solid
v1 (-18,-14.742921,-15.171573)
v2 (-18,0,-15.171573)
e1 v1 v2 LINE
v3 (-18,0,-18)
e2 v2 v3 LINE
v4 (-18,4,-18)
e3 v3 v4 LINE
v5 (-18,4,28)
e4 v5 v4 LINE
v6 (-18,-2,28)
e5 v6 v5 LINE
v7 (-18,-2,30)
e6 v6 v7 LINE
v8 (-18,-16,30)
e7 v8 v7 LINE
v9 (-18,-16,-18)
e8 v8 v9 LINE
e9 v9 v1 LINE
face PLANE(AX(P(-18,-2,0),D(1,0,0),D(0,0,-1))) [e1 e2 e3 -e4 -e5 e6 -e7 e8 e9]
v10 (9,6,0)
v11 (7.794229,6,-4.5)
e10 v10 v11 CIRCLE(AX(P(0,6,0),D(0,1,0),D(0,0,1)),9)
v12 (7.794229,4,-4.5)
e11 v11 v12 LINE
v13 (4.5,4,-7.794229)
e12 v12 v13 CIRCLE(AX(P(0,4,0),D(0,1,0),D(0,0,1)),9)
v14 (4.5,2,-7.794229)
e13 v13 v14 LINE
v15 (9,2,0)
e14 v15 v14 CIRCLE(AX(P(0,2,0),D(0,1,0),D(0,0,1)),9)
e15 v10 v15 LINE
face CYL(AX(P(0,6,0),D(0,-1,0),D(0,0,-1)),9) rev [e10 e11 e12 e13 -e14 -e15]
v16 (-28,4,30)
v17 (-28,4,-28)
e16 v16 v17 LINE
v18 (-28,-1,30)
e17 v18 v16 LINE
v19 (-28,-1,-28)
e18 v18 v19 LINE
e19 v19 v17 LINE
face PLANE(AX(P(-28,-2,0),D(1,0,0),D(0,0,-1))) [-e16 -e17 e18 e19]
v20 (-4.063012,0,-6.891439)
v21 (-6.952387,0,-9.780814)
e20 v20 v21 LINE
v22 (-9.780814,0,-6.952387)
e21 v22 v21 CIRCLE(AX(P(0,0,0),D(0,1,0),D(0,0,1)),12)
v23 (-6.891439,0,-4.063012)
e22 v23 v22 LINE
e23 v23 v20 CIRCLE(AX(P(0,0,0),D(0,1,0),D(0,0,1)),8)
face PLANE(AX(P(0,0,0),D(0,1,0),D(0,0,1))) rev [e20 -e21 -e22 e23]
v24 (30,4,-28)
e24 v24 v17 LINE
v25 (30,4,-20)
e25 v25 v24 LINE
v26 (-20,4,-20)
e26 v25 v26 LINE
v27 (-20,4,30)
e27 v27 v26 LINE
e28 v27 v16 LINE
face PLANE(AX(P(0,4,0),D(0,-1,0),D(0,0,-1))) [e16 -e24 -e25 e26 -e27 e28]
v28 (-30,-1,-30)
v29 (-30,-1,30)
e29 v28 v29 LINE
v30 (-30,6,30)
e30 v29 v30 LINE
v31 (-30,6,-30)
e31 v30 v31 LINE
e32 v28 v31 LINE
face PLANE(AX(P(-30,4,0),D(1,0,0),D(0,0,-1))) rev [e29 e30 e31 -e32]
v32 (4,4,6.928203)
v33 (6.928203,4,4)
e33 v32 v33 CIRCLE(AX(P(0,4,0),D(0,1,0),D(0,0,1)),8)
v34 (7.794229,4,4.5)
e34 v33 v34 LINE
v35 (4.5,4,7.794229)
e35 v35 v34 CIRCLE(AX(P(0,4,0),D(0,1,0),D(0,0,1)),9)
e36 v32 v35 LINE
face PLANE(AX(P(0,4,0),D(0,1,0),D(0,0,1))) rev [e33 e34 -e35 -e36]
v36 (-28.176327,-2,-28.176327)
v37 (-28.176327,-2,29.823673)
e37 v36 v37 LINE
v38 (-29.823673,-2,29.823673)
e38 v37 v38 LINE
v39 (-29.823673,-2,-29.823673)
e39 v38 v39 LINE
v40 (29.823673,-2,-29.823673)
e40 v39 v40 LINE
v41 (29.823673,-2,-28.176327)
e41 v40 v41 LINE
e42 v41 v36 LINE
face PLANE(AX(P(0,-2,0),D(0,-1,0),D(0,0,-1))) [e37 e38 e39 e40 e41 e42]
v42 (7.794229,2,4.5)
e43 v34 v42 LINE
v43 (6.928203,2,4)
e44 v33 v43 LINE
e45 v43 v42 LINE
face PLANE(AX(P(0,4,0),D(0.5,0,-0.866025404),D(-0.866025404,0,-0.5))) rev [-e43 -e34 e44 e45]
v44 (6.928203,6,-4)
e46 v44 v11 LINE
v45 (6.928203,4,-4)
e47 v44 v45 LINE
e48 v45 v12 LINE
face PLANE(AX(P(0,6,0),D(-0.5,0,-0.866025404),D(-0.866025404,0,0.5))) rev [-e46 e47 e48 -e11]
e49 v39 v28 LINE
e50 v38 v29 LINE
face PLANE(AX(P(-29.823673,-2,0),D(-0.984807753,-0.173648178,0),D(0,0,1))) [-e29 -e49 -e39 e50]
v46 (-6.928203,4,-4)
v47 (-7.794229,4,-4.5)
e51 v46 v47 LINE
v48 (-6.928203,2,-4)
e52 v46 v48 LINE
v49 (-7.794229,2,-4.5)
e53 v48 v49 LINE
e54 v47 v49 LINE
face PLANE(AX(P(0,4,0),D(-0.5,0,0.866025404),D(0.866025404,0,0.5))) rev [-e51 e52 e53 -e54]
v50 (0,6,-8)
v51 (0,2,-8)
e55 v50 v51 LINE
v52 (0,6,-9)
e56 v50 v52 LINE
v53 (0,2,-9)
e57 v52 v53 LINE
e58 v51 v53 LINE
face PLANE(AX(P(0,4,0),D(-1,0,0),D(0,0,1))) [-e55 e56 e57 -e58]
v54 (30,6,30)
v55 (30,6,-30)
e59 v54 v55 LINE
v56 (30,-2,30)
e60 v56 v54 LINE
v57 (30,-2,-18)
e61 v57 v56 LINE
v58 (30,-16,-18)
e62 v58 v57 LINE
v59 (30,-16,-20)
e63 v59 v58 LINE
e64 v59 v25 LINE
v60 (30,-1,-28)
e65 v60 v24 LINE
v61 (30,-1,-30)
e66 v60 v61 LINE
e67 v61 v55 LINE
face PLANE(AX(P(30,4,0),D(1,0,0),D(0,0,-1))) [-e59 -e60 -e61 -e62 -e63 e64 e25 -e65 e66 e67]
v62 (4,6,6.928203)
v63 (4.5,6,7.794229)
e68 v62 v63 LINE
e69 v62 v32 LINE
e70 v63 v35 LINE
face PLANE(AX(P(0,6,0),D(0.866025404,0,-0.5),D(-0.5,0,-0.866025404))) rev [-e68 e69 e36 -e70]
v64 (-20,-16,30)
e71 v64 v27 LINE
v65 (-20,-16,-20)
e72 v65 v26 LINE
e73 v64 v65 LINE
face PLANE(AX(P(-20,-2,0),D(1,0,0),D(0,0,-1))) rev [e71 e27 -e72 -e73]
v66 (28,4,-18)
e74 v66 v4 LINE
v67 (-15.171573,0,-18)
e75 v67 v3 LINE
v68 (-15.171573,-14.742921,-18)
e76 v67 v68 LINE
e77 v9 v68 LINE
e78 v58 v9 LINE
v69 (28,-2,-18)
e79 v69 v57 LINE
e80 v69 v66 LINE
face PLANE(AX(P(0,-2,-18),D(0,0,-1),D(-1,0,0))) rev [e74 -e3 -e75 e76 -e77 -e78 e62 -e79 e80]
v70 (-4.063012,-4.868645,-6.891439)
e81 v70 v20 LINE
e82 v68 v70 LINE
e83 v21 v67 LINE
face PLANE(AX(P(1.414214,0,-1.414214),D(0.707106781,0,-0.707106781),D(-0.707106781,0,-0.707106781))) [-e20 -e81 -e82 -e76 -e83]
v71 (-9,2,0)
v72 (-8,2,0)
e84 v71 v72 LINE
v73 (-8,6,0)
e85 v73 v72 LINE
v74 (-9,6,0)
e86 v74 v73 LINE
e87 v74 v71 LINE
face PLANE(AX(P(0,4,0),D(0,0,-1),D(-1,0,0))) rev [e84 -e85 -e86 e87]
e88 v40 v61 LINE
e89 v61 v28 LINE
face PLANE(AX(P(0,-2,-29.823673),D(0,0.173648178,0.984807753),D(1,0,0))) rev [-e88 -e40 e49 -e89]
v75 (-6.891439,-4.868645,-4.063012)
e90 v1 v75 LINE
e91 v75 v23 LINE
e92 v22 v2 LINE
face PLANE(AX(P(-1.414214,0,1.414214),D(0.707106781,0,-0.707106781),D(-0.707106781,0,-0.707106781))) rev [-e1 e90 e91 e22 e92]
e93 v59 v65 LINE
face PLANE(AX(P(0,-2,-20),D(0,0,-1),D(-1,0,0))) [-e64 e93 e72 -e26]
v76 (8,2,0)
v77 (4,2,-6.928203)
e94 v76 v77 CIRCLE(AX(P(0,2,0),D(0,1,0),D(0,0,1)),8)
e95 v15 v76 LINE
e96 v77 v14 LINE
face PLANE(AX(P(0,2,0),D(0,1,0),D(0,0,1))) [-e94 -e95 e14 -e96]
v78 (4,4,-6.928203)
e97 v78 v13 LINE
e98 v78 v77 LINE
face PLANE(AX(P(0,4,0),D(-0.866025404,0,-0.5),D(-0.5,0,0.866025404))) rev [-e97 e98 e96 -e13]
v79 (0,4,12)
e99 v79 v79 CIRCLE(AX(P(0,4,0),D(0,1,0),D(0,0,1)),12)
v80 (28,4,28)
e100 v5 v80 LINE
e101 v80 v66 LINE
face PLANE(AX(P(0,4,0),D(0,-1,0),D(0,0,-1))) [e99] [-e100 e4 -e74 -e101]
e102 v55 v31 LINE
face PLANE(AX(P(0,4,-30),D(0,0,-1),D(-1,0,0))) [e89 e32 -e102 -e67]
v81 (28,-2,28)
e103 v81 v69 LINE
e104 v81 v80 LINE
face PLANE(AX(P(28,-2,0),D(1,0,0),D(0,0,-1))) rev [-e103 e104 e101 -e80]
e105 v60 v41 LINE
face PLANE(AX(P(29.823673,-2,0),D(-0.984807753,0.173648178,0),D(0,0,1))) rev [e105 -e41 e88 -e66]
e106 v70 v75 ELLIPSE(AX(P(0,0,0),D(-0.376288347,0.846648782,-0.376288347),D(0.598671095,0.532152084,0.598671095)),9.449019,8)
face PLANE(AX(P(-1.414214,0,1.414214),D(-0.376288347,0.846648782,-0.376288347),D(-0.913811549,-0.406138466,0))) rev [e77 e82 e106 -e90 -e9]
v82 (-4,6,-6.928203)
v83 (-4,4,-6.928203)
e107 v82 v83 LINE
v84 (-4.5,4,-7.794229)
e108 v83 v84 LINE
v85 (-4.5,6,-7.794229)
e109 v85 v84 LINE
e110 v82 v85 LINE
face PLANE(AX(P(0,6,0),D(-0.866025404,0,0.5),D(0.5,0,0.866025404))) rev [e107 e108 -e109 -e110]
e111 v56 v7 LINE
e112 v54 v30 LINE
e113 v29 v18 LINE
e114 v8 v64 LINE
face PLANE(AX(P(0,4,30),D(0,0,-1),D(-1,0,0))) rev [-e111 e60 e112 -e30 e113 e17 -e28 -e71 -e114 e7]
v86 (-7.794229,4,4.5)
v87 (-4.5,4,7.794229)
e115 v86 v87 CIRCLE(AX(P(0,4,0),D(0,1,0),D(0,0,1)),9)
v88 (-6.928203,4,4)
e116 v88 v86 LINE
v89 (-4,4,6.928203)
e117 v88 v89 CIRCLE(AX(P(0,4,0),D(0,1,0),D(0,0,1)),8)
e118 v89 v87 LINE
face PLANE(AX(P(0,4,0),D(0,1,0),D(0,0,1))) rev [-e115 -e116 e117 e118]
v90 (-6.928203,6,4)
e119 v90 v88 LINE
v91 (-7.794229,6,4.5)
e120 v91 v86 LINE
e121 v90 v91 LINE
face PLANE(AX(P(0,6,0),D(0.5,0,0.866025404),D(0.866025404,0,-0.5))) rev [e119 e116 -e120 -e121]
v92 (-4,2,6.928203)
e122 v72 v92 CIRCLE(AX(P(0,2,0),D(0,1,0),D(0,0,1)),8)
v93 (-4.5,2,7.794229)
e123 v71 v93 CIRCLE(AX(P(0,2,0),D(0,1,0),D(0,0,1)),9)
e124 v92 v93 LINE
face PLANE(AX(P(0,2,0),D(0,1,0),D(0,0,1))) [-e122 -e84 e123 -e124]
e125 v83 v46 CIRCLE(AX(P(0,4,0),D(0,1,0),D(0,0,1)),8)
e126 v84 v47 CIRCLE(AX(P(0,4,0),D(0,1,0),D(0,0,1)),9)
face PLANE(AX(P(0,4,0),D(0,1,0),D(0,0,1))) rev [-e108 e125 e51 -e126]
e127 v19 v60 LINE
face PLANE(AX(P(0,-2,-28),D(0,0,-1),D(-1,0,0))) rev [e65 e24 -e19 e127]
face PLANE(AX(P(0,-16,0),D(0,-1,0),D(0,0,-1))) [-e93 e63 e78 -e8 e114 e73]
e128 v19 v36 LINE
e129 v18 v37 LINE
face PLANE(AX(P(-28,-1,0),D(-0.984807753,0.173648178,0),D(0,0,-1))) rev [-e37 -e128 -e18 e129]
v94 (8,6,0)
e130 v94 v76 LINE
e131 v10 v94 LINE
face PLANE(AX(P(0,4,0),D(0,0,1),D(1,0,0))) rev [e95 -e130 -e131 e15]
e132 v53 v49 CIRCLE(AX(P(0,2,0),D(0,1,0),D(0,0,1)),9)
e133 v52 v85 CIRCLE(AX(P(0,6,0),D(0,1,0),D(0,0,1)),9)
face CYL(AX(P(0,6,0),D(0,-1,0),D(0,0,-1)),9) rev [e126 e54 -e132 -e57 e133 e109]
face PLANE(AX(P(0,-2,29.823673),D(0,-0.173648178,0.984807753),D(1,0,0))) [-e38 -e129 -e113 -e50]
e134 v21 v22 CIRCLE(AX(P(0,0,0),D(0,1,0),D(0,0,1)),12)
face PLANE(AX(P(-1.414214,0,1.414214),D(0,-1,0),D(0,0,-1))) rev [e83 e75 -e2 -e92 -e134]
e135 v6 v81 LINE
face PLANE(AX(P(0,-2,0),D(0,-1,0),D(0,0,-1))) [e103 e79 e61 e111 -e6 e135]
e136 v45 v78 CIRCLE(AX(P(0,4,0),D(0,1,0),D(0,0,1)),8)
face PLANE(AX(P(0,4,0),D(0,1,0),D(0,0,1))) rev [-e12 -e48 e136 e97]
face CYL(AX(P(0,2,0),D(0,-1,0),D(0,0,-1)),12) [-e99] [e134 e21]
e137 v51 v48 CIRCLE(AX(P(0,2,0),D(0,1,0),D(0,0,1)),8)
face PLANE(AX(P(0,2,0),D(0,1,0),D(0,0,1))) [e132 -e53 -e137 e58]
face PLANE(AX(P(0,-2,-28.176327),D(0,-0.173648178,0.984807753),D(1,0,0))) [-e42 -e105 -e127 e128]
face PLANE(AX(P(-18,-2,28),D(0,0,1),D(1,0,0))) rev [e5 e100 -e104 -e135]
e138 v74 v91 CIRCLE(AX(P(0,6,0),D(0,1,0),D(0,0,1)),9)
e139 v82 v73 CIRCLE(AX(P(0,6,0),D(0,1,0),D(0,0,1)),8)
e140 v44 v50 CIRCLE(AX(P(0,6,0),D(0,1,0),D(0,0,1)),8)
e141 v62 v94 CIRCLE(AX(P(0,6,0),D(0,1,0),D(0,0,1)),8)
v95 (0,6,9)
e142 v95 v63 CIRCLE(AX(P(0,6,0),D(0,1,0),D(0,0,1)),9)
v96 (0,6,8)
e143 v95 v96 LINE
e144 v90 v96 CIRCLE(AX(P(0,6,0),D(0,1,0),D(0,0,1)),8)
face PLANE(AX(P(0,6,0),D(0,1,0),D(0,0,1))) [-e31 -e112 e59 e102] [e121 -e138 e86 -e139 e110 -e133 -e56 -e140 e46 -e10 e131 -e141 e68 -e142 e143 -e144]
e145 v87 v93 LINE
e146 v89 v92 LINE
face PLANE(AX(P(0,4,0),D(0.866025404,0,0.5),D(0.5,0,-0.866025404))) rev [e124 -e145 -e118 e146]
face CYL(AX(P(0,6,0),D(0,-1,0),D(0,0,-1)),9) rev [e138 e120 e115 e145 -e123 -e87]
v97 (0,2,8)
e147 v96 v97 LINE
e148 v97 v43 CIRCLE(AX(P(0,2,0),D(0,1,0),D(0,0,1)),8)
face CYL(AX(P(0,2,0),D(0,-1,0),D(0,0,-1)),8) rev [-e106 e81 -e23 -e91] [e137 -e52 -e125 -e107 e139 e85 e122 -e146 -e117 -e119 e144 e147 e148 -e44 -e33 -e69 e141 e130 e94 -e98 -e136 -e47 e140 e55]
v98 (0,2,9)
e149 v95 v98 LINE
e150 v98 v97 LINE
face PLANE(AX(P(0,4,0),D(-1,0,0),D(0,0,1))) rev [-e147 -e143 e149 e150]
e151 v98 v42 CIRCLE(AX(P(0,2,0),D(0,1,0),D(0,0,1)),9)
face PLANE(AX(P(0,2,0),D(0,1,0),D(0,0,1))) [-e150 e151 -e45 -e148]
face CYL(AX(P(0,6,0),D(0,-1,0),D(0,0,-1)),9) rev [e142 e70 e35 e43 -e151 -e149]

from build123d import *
from OCP.BRepFilletAPI import BRepFilletAPI_MakeChamfer
from build123d.topology import SkipClean

# Parameters (mm, degrees)
SKETCH1_R                 = 12
SKETCH1_R_2               = 8
BOSS_EXTRUDE4_DEPTH       = 2
BOSS_EXTRUDE5_START       = 2
SKETCH1_9_R               = 12
SKETCH1_9_R_2             = 9
BOSS_EXTRUDE5_DEPTH       = 4
BOSS_EXTRUDE6_START       = 2
BOSS_EXTRUDE6_DEPTH       = 2
BOSS_EXTRUDE7_START       = 4
BOSS_EXTRUDE7_DEPTH       = 2
BOSS_EXTRUDE8_START       = 4
SKETCH1_12_W              = 60
SKETCH1_12_H              = 60
SKETCH1_12_R              = 12
BOSS_EXTRUDE8_DEPTH       = 2
BOSS_EXTRUDE9_DEPTH       = 6
CHAMFER1_SIZE             = 1
CHAMFER1_SIZE2            = 0.176326981
BOSS_EXTRUDE10_DEPTH      = 6
BOSS_EXTRUDE11_DEPTH      = 20
BOSS_EXTRUDE12_DEPTH      = 2
BOSS_EXTRUDE12_DEPTH_BACK = 2
SKETCH1_14_R              = 8
CUT_EXTRUDE1_DEPTH        = 46.343136195


with BuildPart() as part:
    # Sketch1 → Boss-Extrude4 (new body)
    with BuildSketch(Plane(origin=(0, 0, 0), x_dir=(1, 0, 0), z_dir=(0, 1, 0))):
        with Locations(Location((0, 0, 0), (0, 0, 270))):
            Circle(SKETCH1_R)
        with Locations(Location((0, 0, 0), (0, 0, 270))):
            Circle(SKETCH1_R_2, mode=Mode.SUBTRACT)
    extrude(amount=BOSS_EXTRUDE4_DEPTH)

    # Sketch1<9> → Boss-Extrude5 (add)
    with BuildSketch(Plane(origin=(0, 0, 0), x_dir=(1, 0, 0), z_dir=(0, 1, 0)).offset(BOSS_EXTRUDE5_START)):
        with Locations(Location((0, 0, 0), (0, 0, 270))):
            Circle(SKETCH1_9_R)
        with Locations(Location((0, 0, 0), (0, 0, 270))):
            Circle(SKETCH1_9_R_2, mode=Mode.SUBTRACT)
    extrude(amount=BOSS_EXTRUDE5_DEPTH)

    # Sketch1<10> → Boss-Extrude6 (add)
    with SkipClean():  # the faces are left unmerged after this step: merging them gives an invalid solid
        with BuildSketch(Plane(origin=(0, 0, 0), x_dir=(1, 0, 0), z_dir=(0, 1, 0)).offset(BOSS_EXTRUDE6_START)):
            with BuildLine():
                ThreePointArc((0, 8), (2.070552361, 7.72740661), (4, 6.92820323))
                Line((4, 6.92820323), (4.5, 7.794228634))
                ThreePointArc((4.5, 7.794228634), (2.329371406, 8.693332437), (0, 9))
                Line((0, 9), (0, 8))
            make_face()
            with BuildLine():
                ThreePointArc((-8, 0), (-7.72740661, 2.070552361), (-6.92820323, 4))
                Line((-6.92820323, 4), (-7.794228634, 4.5))
                ThreePointArc((-7.794228634, 4.5), (-8.693332437, 2.329371406), (-9, 0))
                Line((-9, 0), (-8, 0))
            make_face()
            with BuildLine():
                Line((0, -9), (0, -8))
                ThreePointArc((0, -8), (-2.070552361, -7.72740661), (-4, -6.92820323))
                Line((-4, -6.92820323), (-4.5, -7.794228634))
                ThreePointArc((-4.5, -7.794228634), (-2.329371406, -8.693332437), (0, -9))
            make_face()
            with BuildLine():
                Line((9, 0), (8, 0))
                ThreePointArc((8, 0), (7.72740661, -2.070552361), (6.92820323, -4))
                Line((6.92820323, -4), (7.794228634, -4.5))
                ThreePointArc((7.794228634, -4.5), (8.693332437, -2.329371406), (9, 0))
            make_face()
        extrude(amount=BOSS_EXTRUDE6_DEPTH)

    # Sketch1<11> → Boss-Extrude7 (add)
    with SkipClean():  # the faces are left unmerged after this step: merging them gives an invalid solid
        with BuildSketch(Plane(origin=(0, 0, 0), x_dir=(1, 0, 0), z_dir=(0, 1, 0)).offset(BOSS_EXTRUDE7_START)):
            with BuildLine():
                ThreePointArc((0, 8), (2.070552361, 7.72740661), (4, 6.92820323))
                Line((4, 6.92820323), (4.5, 7.794228634))
                ThreePointArc((4.5, 7.794228634), (2.329371406, 8.693332437), (0, 9))
                Line((0, 9), (0, 8))
            make_face()
            with BuildLine():
                ThreePointArc((4, 6.92820323), (5.656854249, 5.656854249), (6.92820323, 4))
                Line((6.92820323, 4), (7.794228634, 4.5))
                ThreePointArc((7.794228634, 4.5), (6.363961031, 6.363961031), (4.5, 7.794228634))
                Line((4.5, 7.794228634), (4, 6.92820323))
            make_face()
            with BuildLine():
                ThreePointArc((-8, 0), (-7.72740661, 2.070552361), (-6.92820323, 4))
                Line((-6.92820323, 4), (-7.794228634, 4.5))
                ThreePointArc((-7.794228634, 4.5), (-8.693332437, 2.329371406), (-9, 0))
                Line((-9, 0), (-8, 0))
            make_face()
            with BuildLine():
                ThreePointArc((-6.92820323, 4), (-5.656854249, 5.656854249), (-4, 6.92820323))
                Line((-4, 6.92820323), (-4.5, 7.794228634))
                ThreePointArc((-4.5, 7.794228634), (-6.363961031, 6.363961031), (-7.794228634, 4.5))
                Line((-7.794228634, 4.5), (-6.92820323, 4))
            make_face()
            with BuildLine():
                Line((-4.5, -7.794228634), (-4, -6.92820323))
                ThreePointArc((-4, -6.92820323), (-5.656854249, -5.656854249), (-6.92820323, -4))
                Line((-6.92820323, -4), (-7.794228634, -4.5))
                ThreePointArc((-7.794228634, -4.5), (-6.363961031, -6.363961031), (-4.5, -7.794228634))
            make_face()
            with BuildLine():
                Line((0, -9), (0, -8))
                ThreePointArc((0, -8), (-2.070552361, -7.72740661), (-4, -6.92820323))
                Line((-4, -6.92820323), (-4.5, -7.794228634))
                ThreePointArc((-4.5, -7.794228634), (-2.329371406, -8.693332437), (0, -9))
            make_face()
            with BuildLine():
                Line((9, 0), (8, 0))
                ThreePointArc((8, 0), (7.72740661, -2.070552361), (6.92820323, -4))
                Line((6.92820323, -4), (7.794228634, -4.5))
                ThreePointArc((7.794228634, -4.5), (8.693332437, -2.329371406), (9, 0))
            make_face()
            with BuildLine():
                Line((7.794228634, -4.5), (6.92820323, -4))
                ThreePointArc((6.92820323, -4), (5.656854249, -5.656854249), (4, -6.92820323))
                Line((4, -6.92820323), (4.5, -7.794228634))
                ThreePointArc((4.5, -7.794228634), (6.363961031, -6.363961031), (7.794228634, -4.5))
            make_face()
        extrude(amount=BOSS_EXTRUDE7_DEPTH)

    # Sketch1<12> → Boss-Extrude8 (add)
    with SkipClean():  # the faces are left unmerged after this step: merging them gives an invalid solid
        with BuildSketch(Plane(origin=(0, 0, 0), x_dir=(1, 0, 0), z_dir=(0, 1, 0)).offset(BOSS_EXTRUDE8_START)):
            Rectangle(SKETCH1_12_W, SKETCH1_12_H)
            with Locations(Location((0, 0, 0), (0, 0, 270))):
                Circle(SKETCH1_12_R, mode=Mode.SUBTRACT)
        extrude(amount=BOSS_EXTRUDE8_DEPTH)

    # Sketch3 → Boss-Extrude9 (add)
    with SkipClean():  # the faces are left unmerged after this step: merging them gives an invalid solid
        with BuildSketch(Plane.XZ.offset(-4)):
            Polygon((-30, -30), (30, -30), (30, -28), (-28, -28), (-28, 30), (-30, 30), align=None)
            Polygon((30, -20), (30, -18), (-18, -18), (-18, 30), (-20, 30), (-20, -20), align=None)
        extrude(amount=BOSS_EXTRUDE9_DEPTH)

    # Chamfer1: one chamfer whose edges measure the first distance from different faces: ONE call of the kernel's chamfer builder (chamfer() names one face for all edges)
    chamfer1_edges_1 = [part.edges().sort_by_distance(p)[0] for p in [
        (-28, -2, 1),
    ]]
    chamfer1_side_1 = [part.faces().sort_by_distance(p)[0] for p in [
        (-28, 1, 1),
    ]]
    chamfer1_edges_2 = [part.edges().sort_by_distance(p)[0] for p in [
        (1, -2, -28),
    ]]
    chamfer1_side_2 = [part.faces().sort_by_distance(p)[0] for p in [
        (1, 1, -28),
    ]]
    chamfer1_edges_3 = [part.edges().sort_by_distance(p)[0] for p in [
        (-29, -2, 30),
    ]]
    chamfer1_side_3 = [part.faces().sort_by_distance(p)[0] for p in [
        (-29, 1, 30),
    ]]
    chamfer1_edges_4 = [part.edges().sort_by_distance(p)[0] for p in [
        (-30, -2, 0),
    ]]
    chamfer1_side_4 = [part.faces().sort_by_distance(p)[0] for p in [
        (-30, 1, 0),
    ]]
    chamfer1_edges_5 = [part.edges().sort_by_distance(p)[0] for p in [
        (0, -2, -30),
    ]]
    chamfer1_side_5 = [part.faces().sort_by_distance(p)[0] for p in [
        (0, 1, -30),
    ]]
    chamfer1_edges_6 = [part.edges().sort_by_distance(p)[0] for p in [
        (30, -2, -29),
    ]]
    chamfer1_side_6 = [part.faces().sort_by_distance(p)[0] for p in [
        (30, 1, -29),
    ]]
    chamfer1 = BRepFilletAPI_MakeChamfer(part.part.solid().wrapped)
    for e in chamfer1_edges_1:
        chamfer1.Add(CHAMFER1_SIZE, CHAMFER1_SIZE2, e.wrapped, chamfer1_side_1[0].wrapped)  # the first distance lies on this face
    for e in chamfer1_edges_2:
        chamfer1.Add(CHAMFER1_SIZE, CHAMFER1_SIZE2, e.wrapped, chamfer1_side_2[0].wrapped)  # the first distance lies on this face
    for e in chamfer1_edges_3:
        chamfer1.Add(CHAMFER1_SIZE, CHAMFER1_SIZE2, e.wrapped, chamfer1_side_3[0].wrapped)  # the first distance lies on this face
    for e in chamfer1_edges_4:
        chamfer1.Add(CHAMFER1_SIZE, CHAMFER1_SIZE2, e.wrapped, chamfer1_side_4[0].wrapped)  # the first distance lies on this face
    for e in chamfer1_edges_5:
        chamfer1.Add(CHAMFER1_SIZE, CHAMFER1_SIZE2, e.wrapped, chamfer1_side_5[0].wrapped)  # the first distance lies on this face
    for e in chamfer1_edges_6:
        chamfer1.Add(CHAMFER1_SIZE, CHAMFER1_SIZE2, e.wrapped, chamfer1_side_6[0].wrapped)  # the first distance lies on this face
    add(Compound.cast(chamfer1.Shape()), mode=Mode.REPLACE)

    # Sketch6 → Boss-Extrude10 (add)
    with BuildSketch(Plane.XZ.offset(-4)):
        Polygon((-18, 30), (-18, 28), (28, 28), (28, -18), (30, -18), (30, 30), align=None)
    extrude(amount=BOSS_EXTRUDE10_DEPTH)

    # Sketch3<3> → Boss-Extrude11 (add)
    with BuildSketch(Plane.XZ.offset(-4)):
        Polygon((-20, 30), (-20, -20), (-18, -18), (-18, 28), (-18, 30), align=None)
        Polygon((-20, -20), (30, -20), (30, -18), (28, -18), (-18, -18), align=None)
    extrude(amount=BOSS_EXTRUDE11_DEPTH)

    # Sketch9 → Boss-Extrude12 (add, two sides: drawn at the far end of the back side and taken through both)
    with BuildSketch(Plane(origin=(0, 0, 0), x_dir=(-0.7071067811865476, 0, -0.7071067811865475), z_dir=(0.7071067811865475, 0, -0.7071067811865476)).offset(-BOSS_EXTRUDE12_DEPTH_BACK)):
        Polygon((25.455844123, -16), (25.455844123, 0), (0, 0), align=None)
    extrude(amount=BOSS_EXTRUDE12_DEPTH + BOSS_EXTRUDE12_DEPTH_BACK)

    # Sketch1<14> → Cut-Extrude1 (cut, through all)
    with SkipClean():  # the faces are left unmerged after this step: merging them gives an invalid solid
        with BuildSketch(Plane(origin=(0, 0, 0), x_dir=(1, 0, 0), z_dir=(0, 1, 0))):
            with Locations(Location((0, 0, 0), (0, 0, 90))):
                Circle(SKETCH1_14_R)
        extrude(amount=-CUT_EXTRUDE1_DEPTH, mode=Mode.SUBTRACT)
    add(part.part.scale(1), mode=Mode.REPLACE)  # the faces are merged on a copy


solid = part.part
